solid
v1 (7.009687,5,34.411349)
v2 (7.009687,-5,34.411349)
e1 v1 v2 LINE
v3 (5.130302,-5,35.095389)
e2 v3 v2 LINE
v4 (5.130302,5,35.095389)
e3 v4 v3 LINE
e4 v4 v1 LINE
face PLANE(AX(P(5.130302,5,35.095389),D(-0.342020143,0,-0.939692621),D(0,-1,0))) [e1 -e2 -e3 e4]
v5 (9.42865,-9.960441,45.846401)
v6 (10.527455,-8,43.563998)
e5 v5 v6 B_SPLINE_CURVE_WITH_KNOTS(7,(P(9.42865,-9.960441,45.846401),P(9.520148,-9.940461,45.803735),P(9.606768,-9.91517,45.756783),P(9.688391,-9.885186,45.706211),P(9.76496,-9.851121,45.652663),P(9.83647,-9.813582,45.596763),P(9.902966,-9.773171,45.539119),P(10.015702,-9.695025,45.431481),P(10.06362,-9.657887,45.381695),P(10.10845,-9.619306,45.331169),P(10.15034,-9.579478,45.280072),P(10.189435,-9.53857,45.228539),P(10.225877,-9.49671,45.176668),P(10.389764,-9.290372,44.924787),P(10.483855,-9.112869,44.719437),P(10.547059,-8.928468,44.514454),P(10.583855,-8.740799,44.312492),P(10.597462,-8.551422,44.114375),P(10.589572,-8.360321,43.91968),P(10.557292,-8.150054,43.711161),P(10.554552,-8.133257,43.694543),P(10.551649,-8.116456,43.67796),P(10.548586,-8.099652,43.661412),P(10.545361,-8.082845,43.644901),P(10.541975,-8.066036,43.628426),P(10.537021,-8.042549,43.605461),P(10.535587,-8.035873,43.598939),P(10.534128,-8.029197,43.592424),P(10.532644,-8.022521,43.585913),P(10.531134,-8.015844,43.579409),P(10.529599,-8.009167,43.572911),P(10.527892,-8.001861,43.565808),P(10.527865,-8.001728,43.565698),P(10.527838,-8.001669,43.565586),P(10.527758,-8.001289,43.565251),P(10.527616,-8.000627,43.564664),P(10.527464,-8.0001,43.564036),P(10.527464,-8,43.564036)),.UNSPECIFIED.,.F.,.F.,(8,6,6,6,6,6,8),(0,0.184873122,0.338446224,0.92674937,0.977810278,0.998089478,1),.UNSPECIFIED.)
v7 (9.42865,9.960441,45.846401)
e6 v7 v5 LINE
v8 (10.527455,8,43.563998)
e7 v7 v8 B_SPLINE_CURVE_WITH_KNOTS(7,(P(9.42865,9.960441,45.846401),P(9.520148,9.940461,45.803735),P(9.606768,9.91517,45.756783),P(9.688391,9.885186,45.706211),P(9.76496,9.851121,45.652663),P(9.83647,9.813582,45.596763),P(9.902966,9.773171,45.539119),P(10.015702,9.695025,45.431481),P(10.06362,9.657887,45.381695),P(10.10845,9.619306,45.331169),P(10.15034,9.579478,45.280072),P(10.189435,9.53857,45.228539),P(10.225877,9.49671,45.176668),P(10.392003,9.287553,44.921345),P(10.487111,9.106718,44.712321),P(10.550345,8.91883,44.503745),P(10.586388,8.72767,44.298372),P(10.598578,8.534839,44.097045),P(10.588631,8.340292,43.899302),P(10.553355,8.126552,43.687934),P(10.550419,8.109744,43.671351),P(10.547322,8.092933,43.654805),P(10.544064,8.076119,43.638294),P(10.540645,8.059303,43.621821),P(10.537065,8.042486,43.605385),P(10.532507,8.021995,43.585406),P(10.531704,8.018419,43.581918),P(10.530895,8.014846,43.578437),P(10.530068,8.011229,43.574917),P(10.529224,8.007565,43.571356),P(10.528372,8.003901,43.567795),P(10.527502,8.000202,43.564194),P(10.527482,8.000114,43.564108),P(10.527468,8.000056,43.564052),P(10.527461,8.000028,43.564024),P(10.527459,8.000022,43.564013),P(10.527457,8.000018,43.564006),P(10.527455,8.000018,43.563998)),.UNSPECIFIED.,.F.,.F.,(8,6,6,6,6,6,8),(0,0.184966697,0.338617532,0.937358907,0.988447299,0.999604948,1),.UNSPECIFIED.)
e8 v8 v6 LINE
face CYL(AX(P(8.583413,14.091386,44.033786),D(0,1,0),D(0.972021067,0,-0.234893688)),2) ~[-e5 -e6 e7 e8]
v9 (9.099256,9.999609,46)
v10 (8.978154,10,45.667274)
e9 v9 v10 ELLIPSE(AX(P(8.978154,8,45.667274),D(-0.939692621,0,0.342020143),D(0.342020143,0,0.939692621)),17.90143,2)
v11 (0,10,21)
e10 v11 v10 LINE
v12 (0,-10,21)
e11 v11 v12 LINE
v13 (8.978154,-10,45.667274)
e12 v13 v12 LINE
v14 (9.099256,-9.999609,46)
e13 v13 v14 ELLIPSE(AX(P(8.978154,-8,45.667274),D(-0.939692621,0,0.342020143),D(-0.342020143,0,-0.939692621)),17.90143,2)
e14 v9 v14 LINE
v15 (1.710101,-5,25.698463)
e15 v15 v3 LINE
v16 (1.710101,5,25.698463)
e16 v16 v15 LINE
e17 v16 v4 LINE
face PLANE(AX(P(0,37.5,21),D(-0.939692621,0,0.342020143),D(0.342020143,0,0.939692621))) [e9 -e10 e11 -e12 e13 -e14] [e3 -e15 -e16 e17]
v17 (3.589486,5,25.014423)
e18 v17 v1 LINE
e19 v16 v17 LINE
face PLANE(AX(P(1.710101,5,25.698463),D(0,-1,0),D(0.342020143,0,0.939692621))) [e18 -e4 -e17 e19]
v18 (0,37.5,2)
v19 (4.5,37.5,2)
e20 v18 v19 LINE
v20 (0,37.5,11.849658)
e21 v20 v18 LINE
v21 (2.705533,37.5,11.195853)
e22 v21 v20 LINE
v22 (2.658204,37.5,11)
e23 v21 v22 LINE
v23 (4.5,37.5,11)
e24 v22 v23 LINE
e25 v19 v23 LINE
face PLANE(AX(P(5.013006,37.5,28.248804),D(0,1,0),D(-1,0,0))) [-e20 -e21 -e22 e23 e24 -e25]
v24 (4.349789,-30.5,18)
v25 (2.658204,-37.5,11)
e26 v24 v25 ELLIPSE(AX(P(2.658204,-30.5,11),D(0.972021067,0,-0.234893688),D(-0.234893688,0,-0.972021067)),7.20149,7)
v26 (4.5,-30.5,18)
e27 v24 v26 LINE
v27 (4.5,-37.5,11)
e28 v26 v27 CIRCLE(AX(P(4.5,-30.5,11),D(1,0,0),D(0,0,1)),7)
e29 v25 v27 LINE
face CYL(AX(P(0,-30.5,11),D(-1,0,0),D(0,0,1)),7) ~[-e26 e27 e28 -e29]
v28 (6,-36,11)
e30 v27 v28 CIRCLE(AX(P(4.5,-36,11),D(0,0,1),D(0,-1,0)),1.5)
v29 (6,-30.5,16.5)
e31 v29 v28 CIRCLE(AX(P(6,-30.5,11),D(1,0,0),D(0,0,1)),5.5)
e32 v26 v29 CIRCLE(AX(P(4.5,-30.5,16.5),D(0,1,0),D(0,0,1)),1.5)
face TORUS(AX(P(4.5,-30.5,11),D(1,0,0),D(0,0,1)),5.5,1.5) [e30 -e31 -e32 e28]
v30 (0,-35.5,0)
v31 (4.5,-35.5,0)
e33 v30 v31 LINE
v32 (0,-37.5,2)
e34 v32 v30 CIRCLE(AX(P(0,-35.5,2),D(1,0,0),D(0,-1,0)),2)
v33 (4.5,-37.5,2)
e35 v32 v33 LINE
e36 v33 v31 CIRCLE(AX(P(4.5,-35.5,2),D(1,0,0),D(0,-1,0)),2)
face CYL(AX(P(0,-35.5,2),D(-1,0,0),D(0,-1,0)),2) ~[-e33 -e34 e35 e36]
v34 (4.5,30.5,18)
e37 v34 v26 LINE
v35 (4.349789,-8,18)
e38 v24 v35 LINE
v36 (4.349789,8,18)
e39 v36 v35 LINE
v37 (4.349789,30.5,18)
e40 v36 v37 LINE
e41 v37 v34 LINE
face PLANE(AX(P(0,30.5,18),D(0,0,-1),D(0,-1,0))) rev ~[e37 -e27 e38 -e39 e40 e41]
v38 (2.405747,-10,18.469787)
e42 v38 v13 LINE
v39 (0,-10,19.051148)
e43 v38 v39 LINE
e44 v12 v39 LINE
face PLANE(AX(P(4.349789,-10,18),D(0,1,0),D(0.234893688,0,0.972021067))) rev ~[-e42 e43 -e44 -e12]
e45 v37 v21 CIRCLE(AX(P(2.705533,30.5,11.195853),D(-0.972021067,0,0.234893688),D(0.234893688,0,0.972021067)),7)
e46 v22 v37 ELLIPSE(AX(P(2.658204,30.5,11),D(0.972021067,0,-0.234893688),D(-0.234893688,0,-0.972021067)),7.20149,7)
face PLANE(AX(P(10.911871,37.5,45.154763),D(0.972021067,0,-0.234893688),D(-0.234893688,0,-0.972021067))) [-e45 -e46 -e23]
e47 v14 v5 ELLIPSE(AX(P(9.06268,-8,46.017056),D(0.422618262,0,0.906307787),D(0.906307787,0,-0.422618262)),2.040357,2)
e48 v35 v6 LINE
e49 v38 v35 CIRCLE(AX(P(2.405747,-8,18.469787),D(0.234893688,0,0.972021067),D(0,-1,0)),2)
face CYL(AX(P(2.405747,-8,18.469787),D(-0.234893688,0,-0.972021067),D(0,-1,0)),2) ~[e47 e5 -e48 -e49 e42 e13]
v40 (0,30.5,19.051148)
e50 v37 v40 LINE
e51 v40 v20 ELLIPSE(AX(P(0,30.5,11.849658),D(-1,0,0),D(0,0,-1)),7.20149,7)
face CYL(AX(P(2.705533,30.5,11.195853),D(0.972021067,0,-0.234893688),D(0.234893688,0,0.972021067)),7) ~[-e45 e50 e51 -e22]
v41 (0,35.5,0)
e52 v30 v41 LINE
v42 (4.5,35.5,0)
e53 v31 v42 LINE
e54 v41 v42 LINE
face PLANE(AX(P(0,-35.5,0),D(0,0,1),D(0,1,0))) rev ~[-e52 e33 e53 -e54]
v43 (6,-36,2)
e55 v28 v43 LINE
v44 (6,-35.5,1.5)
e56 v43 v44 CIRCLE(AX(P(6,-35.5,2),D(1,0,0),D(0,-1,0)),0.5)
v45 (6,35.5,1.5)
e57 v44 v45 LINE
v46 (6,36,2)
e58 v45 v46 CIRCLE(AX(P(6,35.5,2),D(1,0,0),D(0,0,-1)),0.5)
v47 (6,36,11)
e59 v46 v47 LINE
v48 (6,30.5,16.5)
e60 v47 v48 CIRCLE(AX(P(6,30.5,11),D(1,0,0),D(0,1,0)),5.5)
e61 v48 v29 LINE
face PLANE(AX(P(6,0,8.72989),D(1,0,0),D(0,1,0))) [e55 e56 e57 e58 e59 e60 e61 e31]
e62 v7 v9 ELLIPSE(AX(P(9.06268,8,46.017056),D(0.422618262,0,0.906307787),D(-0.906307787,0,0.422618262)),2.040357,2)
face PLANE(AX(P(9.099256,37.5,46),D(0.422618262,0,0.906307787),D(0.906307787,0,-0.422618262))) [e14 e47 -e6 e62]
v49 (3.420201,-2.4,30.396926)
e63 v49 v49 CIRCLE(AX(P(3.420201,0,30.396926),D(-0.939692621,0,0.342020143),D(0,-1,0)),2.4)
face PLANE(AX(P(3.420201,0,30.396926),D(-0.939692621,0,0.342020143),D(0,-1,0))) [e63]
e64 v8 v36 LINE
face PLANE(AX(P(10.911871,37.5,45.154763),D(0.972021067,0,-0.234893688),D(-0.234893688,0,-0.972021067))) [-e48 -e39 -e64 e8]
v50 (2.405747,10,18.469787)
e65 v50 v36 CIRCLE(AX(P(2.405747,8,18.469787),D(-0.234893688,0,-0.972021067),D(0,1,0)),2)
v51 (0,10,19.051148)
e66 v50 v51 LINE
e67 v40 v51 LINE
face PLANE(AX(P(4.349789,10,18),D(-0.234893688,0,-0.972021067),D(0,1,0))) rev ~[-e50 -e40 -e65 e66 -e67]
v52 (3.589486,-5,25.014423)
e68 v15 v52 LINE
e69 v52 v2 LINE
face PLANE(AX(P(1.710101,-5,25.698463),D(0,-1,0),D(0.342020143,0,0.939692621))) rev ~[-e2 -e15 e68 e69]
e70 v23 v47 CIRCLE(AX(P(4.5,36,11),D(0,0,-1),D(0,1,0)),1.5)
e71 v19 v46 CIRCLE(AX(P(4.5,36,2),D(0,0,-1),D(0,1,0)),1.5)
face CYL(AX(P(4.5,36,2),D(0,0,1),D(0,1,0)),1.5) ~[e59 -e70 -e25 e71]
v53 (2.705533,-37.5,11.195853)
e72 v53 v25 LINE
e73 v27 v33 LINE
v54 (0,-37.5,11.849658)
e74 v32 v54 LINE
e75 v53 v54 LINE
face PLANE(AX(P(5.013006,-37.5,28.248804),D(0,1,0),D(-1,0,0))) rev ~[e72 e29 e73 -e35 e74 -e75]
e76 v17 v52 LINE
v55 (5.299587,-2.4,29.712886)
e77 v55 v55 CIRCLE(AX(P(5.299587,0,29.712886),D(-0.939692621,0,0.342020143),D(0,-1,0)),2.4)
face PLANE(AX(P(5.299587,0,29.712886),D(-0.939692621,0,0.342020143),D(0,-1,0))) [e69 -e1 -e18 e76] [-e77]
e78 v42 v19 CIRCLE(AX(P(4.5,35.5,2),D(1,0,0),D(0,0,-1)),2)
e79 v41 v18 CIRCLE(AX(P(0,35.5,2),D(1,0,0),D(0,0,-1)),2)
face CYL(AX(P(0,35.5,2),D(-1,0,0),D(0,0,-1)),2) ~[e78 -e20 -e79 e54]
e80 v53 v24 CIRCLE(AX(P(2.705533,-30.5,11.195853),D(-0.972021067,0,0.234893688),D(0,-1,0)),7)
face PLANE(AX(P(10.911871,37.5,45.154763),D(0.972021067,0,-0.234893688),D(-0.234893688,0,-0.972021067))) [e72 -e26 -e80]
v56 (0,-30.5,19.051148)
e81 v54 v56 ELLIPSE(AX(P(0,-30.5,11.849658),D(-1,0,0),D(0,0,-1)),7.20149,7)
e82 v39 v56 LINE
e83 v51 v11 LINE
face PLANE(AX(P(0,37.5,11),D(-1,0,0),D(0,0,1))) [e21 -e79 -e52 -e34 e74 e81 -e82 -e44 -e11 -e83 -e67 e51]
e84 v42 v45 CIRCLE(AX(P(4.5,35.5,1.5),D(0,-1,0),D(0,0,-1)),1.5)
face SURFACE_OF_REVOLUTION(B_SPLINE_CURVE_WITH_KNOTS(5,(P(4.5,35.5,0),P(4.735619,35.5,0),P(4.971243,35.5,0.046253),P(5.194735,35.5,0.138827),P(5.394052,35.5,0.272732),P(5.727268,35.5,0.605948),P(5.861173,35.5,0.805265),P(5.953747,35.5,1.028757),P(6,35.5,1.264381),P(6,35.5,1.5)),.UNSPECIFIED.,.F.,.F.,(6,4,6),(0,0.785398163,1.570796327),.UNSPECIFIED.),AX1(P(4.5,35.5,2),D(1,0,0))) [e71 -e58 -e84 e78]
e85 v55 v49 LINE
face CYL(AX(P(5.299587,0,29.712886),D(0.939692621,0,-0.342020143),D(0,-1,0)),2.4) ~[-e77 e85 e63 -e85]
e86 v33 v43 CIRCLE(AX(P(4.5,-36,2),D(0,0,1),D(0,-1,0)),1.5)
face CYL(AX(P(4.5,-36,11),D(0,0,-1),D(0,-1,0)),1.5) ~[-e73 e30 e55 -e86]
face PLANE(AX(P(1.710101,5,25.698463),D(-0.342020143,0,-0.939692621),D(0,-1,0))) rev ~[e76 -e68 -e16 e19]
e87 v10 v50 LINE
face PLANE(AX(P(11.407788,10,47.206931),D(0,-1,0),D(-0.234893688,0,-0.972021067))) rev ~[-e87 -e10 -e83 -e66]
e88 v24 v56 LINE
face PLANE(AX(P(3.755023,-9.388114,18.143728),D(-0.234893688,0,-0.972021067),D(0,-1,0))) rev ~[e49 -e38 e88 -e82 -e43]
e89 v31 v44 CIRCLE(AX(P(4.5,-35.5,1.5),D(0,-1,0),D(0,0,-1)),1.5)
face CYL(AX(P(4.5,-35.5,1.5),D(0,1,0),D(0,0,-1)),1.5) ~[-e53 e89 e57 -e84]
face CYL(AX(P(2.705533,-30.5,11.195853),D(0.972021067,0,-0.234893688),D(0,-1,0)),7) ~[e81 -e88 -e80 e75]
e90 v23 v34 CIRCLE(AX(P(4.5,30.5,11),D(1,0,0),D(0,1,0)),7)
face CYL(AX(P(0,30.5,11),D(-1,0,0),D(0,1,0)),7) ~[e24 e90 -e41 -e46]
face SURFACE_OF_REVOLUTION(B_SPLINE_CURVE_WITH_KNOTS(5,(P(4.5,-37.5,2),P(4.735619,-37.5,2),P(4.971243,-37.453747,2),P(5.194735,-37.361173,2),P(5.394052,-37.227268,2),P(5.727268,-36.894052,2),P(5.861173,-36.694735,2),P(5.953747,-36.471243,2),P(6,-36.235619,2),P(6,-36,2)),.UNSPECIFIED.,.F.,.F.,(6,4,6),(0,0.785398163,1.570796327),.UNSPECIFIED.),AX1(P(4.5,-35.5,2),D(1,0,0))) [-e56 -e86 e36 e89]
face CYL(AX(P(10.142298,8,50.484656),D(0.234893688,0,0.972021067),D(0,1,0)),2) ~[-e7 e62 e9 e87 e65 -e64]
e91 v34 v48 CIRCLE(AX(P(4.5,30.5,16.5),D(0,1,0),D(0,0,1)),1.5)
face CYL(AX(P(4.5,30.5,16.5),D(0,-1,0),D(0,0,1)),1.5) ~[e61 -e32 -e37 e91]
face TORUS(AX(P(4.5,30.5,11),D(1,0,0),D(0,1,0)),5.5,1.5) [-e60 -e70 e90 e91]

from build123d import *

# Parameters (mm, degrees)
F1_DEPTH     = 6
F2_R         = 1.5
F4_DEPTH     = 75
F6_DEPTH     = 10.8061096393
F7_T1_DEPTH  = 28.1827713518
F7_T6_DEPTH  = 32.9363939608
F7_T11_DEPTH = 32.9363939608
F8_W         = 10
F8_H         = 10
F9_DEPTH     = 2
F10_R        = 2.4
F11_DEPTH    = 2


# Not quite as in the source:
# - a fillet or chamfer that OpenCascade refuses, or shapes differently, is made with other operations: its cross-section is extruded or revolved along the edge and cut away or added


with BuildPart() as f1:
    # F0 (on Right) → F1 (new body)
    with BuildSketch(Plane.YZ):
        with BuildLine():
            Line((-35.5, 0), (35.5, 0))
            ThreePointArc((35.5, 0), (36.9142135624, 0.5857864376), (37.5, 2))
            Line((37.5, 2), (37.5, 11))
            ThreePointArc((37.5, 11), (35.4497474683, 15.9497474683), (30.5, 18))
            Line((30.5, 18), (-30.5, 18))
            ThreePointArc((-30.5, 18), (-35.4497474683, 15.9497474683), (-37.5, 11))
            Line((-37.5, 11), (-37.5, 2))
            ThreePointArc((-37.5, 2), (-36.9142135624, 0.5857864376), (-35.5, 0))
        make_face()
    extrude(amount=F1_DEPTH)

    # F2
    f2_edges = [f1.edges().sort_by_distance(p)[0] for p in [
        (6, 37.5, 6.5),
        (6, 0, 0),
        (6, 36.914214, 0.585786),
        (6, 35.449747, 15.949747),
        (6, 0, 18),
        (6, -35.449747, 15.949747),
        (6, -37.5, 6.5),
        (6, -36.914214, 0.585786),
    ]]
    fillet(f2_edges, radius=F2_R)

    # F3 (on face) → F4 (join, through all)
    with BuildSketch(Plane(origin=(0, 37.5, 0), x_dir=(-1, 0, 0), z_dir=(0, 1, 0))):
        Polygon((0, 21), (-9.0992558567, 46), (-10.9118714307, 45.1547634765), (-2.6582042845, 11), (0, 11), align=None)
    extrude(amount=-F4_DEPTH)

    # F5 (on face) → F6 (cut, through all)
    with BuildSketch(Plane(origin=(0, 0, 0), x_dir=(0, 1, 0), z_dir=(0.9720210674, 0, -0.2348936878))):
        with BuildLine():
            ThreePointArc((30.5, 18.5181171521), (35.4497474683, 16.4678646204), (37.5, 11.5181171521))
            Line((37.5, 11.5181171521), (37.5, 48.565749079))
            Line((37.5, 48.565749079), (10, 48.565749079))
            Line((10, 48.565749079), (10, 18.5181171521))
            Line((10, 18.5181171521), (30.5, 18.5181171521))
        make_face()
        with BuildLine():
            Line((-10, 48.565749079), (-37.5, 48.565749079))
            Line((-37.5, 48.565749079), (-37.5, 11.5181171521))
            ThreePointArc((-37.5, 11.5181171521), (-35.4497474683, 16.4678646204), (-30.5, 18.5181171521))
            Line((-30.5, 18.5181171521), (-10, 18.5181171521))
            Line((-10, 18.5181171521), (-10, 48.565749079))
        make_face()
    extrude(amount=-F6_DEPTH, mode=Mode.SUBTRACT)

    # F7: fillet of radius 2 on 3 edges, made by hand

    # F7_s2 → F7_t1 (cut)
    with BuildSketch(Plane.XZ.offset(-14.0913856759)):
        with BuildLine():
            ThreePointArc((10.5274551629, 43.5639982478), (10.3854562197, 44.9013340863), (9.4286495516, 45.8464011975))
            Line((9.4286495516, 45.8464011975), (10.9118714307, 45.1547634765))
            Line((10.9118714307, 45.1547634765), (10.5274551629, 43.5639982478))
        make_face()
    extrude(amount=F7_T1_DEPTH, mode=Mode.SUBTRACT)


with BuildPart() as f7_tool4:
    # F7_s5 → F7_t6 (new body)
    with BuildSketch(Plane(origin=(12.0863398698, 0, 50.0148688134), x_dir=(0, 1, 0), z_dir=(-0.2348936878, 0, -0.9720210674))):
        with BuildLine():
            ThreePointArc((10, -2), (9.4142135624, -0.5857864376), (8, 0))
            Line((8, 0), (10, 0))
            Line((10, 0), (10, -2))
        make_face()
    extrude(amount=F7_T6_DEPTH)

    split(bisect_by=Plane.XY.offset(18), keep=Keep.TOP)


with BuildPart() as f1_1:
    add(f1.part)

    # F7_t3: cut F7_tool4
    add(f7_tool4.part, mode=Mode.SUBTRACT)


with BuildPart() as f7_tool9:
    # F7_s10 → F7_t11 (new body)
    with BuildSketch(Plane(origin=(4.3497888292, 0, 18), x_dir=(0, 1, 0), z_dir=(0.2348936878, 0, 0.9720210674))):
        with BuildLine():
            ThreePointArc((-10, 2), (-9.4142135624, 0.5857864376), (-8, 0))
            Line((-8, 0), (-10, 0))
            Line((-10, 0), (-10, 2))
        make_face()
    extrude(amount=F7_T11_DEPTH)

    split(bisect_by=Plane.XY.offset(18), keep=Keep.TOP)


with BuildPart() as f1_2:
    add(f1_1.part)

    # F7_t8: cut F7_tool9
    add(f7_tool9.part, mode=Mode.SUBTRACT)

    # F8 (on face) → F9 (cut)
    with BuildSketch(Plane(origin=(-6.7492699017, 0, 2.4565333473), x_dir=(0, -1, 0), z_dir=(-0.9396926208, 0, 0.3420201433))):
        with Locations((0, 29.7335450365)):
            Rectangle(F8_W, F8_H)
    extrude(amount=-F9_DEPTH, mode=Mode.SUBTRACT)

    # F10 (on face) → F11 (join)
    with BuildSketch(Plane(origin=(-4.8698846601, 0, 1.7724930606), x_dir=(0, -1, 0), z_dir=(-0.9396926208, 0, 0.3420201433))):
        with Locations((0, 29.7335450365)):
            Circle(F10_R)
    extrude(amount=F11_DEPTH)


solid = f1_2.part
